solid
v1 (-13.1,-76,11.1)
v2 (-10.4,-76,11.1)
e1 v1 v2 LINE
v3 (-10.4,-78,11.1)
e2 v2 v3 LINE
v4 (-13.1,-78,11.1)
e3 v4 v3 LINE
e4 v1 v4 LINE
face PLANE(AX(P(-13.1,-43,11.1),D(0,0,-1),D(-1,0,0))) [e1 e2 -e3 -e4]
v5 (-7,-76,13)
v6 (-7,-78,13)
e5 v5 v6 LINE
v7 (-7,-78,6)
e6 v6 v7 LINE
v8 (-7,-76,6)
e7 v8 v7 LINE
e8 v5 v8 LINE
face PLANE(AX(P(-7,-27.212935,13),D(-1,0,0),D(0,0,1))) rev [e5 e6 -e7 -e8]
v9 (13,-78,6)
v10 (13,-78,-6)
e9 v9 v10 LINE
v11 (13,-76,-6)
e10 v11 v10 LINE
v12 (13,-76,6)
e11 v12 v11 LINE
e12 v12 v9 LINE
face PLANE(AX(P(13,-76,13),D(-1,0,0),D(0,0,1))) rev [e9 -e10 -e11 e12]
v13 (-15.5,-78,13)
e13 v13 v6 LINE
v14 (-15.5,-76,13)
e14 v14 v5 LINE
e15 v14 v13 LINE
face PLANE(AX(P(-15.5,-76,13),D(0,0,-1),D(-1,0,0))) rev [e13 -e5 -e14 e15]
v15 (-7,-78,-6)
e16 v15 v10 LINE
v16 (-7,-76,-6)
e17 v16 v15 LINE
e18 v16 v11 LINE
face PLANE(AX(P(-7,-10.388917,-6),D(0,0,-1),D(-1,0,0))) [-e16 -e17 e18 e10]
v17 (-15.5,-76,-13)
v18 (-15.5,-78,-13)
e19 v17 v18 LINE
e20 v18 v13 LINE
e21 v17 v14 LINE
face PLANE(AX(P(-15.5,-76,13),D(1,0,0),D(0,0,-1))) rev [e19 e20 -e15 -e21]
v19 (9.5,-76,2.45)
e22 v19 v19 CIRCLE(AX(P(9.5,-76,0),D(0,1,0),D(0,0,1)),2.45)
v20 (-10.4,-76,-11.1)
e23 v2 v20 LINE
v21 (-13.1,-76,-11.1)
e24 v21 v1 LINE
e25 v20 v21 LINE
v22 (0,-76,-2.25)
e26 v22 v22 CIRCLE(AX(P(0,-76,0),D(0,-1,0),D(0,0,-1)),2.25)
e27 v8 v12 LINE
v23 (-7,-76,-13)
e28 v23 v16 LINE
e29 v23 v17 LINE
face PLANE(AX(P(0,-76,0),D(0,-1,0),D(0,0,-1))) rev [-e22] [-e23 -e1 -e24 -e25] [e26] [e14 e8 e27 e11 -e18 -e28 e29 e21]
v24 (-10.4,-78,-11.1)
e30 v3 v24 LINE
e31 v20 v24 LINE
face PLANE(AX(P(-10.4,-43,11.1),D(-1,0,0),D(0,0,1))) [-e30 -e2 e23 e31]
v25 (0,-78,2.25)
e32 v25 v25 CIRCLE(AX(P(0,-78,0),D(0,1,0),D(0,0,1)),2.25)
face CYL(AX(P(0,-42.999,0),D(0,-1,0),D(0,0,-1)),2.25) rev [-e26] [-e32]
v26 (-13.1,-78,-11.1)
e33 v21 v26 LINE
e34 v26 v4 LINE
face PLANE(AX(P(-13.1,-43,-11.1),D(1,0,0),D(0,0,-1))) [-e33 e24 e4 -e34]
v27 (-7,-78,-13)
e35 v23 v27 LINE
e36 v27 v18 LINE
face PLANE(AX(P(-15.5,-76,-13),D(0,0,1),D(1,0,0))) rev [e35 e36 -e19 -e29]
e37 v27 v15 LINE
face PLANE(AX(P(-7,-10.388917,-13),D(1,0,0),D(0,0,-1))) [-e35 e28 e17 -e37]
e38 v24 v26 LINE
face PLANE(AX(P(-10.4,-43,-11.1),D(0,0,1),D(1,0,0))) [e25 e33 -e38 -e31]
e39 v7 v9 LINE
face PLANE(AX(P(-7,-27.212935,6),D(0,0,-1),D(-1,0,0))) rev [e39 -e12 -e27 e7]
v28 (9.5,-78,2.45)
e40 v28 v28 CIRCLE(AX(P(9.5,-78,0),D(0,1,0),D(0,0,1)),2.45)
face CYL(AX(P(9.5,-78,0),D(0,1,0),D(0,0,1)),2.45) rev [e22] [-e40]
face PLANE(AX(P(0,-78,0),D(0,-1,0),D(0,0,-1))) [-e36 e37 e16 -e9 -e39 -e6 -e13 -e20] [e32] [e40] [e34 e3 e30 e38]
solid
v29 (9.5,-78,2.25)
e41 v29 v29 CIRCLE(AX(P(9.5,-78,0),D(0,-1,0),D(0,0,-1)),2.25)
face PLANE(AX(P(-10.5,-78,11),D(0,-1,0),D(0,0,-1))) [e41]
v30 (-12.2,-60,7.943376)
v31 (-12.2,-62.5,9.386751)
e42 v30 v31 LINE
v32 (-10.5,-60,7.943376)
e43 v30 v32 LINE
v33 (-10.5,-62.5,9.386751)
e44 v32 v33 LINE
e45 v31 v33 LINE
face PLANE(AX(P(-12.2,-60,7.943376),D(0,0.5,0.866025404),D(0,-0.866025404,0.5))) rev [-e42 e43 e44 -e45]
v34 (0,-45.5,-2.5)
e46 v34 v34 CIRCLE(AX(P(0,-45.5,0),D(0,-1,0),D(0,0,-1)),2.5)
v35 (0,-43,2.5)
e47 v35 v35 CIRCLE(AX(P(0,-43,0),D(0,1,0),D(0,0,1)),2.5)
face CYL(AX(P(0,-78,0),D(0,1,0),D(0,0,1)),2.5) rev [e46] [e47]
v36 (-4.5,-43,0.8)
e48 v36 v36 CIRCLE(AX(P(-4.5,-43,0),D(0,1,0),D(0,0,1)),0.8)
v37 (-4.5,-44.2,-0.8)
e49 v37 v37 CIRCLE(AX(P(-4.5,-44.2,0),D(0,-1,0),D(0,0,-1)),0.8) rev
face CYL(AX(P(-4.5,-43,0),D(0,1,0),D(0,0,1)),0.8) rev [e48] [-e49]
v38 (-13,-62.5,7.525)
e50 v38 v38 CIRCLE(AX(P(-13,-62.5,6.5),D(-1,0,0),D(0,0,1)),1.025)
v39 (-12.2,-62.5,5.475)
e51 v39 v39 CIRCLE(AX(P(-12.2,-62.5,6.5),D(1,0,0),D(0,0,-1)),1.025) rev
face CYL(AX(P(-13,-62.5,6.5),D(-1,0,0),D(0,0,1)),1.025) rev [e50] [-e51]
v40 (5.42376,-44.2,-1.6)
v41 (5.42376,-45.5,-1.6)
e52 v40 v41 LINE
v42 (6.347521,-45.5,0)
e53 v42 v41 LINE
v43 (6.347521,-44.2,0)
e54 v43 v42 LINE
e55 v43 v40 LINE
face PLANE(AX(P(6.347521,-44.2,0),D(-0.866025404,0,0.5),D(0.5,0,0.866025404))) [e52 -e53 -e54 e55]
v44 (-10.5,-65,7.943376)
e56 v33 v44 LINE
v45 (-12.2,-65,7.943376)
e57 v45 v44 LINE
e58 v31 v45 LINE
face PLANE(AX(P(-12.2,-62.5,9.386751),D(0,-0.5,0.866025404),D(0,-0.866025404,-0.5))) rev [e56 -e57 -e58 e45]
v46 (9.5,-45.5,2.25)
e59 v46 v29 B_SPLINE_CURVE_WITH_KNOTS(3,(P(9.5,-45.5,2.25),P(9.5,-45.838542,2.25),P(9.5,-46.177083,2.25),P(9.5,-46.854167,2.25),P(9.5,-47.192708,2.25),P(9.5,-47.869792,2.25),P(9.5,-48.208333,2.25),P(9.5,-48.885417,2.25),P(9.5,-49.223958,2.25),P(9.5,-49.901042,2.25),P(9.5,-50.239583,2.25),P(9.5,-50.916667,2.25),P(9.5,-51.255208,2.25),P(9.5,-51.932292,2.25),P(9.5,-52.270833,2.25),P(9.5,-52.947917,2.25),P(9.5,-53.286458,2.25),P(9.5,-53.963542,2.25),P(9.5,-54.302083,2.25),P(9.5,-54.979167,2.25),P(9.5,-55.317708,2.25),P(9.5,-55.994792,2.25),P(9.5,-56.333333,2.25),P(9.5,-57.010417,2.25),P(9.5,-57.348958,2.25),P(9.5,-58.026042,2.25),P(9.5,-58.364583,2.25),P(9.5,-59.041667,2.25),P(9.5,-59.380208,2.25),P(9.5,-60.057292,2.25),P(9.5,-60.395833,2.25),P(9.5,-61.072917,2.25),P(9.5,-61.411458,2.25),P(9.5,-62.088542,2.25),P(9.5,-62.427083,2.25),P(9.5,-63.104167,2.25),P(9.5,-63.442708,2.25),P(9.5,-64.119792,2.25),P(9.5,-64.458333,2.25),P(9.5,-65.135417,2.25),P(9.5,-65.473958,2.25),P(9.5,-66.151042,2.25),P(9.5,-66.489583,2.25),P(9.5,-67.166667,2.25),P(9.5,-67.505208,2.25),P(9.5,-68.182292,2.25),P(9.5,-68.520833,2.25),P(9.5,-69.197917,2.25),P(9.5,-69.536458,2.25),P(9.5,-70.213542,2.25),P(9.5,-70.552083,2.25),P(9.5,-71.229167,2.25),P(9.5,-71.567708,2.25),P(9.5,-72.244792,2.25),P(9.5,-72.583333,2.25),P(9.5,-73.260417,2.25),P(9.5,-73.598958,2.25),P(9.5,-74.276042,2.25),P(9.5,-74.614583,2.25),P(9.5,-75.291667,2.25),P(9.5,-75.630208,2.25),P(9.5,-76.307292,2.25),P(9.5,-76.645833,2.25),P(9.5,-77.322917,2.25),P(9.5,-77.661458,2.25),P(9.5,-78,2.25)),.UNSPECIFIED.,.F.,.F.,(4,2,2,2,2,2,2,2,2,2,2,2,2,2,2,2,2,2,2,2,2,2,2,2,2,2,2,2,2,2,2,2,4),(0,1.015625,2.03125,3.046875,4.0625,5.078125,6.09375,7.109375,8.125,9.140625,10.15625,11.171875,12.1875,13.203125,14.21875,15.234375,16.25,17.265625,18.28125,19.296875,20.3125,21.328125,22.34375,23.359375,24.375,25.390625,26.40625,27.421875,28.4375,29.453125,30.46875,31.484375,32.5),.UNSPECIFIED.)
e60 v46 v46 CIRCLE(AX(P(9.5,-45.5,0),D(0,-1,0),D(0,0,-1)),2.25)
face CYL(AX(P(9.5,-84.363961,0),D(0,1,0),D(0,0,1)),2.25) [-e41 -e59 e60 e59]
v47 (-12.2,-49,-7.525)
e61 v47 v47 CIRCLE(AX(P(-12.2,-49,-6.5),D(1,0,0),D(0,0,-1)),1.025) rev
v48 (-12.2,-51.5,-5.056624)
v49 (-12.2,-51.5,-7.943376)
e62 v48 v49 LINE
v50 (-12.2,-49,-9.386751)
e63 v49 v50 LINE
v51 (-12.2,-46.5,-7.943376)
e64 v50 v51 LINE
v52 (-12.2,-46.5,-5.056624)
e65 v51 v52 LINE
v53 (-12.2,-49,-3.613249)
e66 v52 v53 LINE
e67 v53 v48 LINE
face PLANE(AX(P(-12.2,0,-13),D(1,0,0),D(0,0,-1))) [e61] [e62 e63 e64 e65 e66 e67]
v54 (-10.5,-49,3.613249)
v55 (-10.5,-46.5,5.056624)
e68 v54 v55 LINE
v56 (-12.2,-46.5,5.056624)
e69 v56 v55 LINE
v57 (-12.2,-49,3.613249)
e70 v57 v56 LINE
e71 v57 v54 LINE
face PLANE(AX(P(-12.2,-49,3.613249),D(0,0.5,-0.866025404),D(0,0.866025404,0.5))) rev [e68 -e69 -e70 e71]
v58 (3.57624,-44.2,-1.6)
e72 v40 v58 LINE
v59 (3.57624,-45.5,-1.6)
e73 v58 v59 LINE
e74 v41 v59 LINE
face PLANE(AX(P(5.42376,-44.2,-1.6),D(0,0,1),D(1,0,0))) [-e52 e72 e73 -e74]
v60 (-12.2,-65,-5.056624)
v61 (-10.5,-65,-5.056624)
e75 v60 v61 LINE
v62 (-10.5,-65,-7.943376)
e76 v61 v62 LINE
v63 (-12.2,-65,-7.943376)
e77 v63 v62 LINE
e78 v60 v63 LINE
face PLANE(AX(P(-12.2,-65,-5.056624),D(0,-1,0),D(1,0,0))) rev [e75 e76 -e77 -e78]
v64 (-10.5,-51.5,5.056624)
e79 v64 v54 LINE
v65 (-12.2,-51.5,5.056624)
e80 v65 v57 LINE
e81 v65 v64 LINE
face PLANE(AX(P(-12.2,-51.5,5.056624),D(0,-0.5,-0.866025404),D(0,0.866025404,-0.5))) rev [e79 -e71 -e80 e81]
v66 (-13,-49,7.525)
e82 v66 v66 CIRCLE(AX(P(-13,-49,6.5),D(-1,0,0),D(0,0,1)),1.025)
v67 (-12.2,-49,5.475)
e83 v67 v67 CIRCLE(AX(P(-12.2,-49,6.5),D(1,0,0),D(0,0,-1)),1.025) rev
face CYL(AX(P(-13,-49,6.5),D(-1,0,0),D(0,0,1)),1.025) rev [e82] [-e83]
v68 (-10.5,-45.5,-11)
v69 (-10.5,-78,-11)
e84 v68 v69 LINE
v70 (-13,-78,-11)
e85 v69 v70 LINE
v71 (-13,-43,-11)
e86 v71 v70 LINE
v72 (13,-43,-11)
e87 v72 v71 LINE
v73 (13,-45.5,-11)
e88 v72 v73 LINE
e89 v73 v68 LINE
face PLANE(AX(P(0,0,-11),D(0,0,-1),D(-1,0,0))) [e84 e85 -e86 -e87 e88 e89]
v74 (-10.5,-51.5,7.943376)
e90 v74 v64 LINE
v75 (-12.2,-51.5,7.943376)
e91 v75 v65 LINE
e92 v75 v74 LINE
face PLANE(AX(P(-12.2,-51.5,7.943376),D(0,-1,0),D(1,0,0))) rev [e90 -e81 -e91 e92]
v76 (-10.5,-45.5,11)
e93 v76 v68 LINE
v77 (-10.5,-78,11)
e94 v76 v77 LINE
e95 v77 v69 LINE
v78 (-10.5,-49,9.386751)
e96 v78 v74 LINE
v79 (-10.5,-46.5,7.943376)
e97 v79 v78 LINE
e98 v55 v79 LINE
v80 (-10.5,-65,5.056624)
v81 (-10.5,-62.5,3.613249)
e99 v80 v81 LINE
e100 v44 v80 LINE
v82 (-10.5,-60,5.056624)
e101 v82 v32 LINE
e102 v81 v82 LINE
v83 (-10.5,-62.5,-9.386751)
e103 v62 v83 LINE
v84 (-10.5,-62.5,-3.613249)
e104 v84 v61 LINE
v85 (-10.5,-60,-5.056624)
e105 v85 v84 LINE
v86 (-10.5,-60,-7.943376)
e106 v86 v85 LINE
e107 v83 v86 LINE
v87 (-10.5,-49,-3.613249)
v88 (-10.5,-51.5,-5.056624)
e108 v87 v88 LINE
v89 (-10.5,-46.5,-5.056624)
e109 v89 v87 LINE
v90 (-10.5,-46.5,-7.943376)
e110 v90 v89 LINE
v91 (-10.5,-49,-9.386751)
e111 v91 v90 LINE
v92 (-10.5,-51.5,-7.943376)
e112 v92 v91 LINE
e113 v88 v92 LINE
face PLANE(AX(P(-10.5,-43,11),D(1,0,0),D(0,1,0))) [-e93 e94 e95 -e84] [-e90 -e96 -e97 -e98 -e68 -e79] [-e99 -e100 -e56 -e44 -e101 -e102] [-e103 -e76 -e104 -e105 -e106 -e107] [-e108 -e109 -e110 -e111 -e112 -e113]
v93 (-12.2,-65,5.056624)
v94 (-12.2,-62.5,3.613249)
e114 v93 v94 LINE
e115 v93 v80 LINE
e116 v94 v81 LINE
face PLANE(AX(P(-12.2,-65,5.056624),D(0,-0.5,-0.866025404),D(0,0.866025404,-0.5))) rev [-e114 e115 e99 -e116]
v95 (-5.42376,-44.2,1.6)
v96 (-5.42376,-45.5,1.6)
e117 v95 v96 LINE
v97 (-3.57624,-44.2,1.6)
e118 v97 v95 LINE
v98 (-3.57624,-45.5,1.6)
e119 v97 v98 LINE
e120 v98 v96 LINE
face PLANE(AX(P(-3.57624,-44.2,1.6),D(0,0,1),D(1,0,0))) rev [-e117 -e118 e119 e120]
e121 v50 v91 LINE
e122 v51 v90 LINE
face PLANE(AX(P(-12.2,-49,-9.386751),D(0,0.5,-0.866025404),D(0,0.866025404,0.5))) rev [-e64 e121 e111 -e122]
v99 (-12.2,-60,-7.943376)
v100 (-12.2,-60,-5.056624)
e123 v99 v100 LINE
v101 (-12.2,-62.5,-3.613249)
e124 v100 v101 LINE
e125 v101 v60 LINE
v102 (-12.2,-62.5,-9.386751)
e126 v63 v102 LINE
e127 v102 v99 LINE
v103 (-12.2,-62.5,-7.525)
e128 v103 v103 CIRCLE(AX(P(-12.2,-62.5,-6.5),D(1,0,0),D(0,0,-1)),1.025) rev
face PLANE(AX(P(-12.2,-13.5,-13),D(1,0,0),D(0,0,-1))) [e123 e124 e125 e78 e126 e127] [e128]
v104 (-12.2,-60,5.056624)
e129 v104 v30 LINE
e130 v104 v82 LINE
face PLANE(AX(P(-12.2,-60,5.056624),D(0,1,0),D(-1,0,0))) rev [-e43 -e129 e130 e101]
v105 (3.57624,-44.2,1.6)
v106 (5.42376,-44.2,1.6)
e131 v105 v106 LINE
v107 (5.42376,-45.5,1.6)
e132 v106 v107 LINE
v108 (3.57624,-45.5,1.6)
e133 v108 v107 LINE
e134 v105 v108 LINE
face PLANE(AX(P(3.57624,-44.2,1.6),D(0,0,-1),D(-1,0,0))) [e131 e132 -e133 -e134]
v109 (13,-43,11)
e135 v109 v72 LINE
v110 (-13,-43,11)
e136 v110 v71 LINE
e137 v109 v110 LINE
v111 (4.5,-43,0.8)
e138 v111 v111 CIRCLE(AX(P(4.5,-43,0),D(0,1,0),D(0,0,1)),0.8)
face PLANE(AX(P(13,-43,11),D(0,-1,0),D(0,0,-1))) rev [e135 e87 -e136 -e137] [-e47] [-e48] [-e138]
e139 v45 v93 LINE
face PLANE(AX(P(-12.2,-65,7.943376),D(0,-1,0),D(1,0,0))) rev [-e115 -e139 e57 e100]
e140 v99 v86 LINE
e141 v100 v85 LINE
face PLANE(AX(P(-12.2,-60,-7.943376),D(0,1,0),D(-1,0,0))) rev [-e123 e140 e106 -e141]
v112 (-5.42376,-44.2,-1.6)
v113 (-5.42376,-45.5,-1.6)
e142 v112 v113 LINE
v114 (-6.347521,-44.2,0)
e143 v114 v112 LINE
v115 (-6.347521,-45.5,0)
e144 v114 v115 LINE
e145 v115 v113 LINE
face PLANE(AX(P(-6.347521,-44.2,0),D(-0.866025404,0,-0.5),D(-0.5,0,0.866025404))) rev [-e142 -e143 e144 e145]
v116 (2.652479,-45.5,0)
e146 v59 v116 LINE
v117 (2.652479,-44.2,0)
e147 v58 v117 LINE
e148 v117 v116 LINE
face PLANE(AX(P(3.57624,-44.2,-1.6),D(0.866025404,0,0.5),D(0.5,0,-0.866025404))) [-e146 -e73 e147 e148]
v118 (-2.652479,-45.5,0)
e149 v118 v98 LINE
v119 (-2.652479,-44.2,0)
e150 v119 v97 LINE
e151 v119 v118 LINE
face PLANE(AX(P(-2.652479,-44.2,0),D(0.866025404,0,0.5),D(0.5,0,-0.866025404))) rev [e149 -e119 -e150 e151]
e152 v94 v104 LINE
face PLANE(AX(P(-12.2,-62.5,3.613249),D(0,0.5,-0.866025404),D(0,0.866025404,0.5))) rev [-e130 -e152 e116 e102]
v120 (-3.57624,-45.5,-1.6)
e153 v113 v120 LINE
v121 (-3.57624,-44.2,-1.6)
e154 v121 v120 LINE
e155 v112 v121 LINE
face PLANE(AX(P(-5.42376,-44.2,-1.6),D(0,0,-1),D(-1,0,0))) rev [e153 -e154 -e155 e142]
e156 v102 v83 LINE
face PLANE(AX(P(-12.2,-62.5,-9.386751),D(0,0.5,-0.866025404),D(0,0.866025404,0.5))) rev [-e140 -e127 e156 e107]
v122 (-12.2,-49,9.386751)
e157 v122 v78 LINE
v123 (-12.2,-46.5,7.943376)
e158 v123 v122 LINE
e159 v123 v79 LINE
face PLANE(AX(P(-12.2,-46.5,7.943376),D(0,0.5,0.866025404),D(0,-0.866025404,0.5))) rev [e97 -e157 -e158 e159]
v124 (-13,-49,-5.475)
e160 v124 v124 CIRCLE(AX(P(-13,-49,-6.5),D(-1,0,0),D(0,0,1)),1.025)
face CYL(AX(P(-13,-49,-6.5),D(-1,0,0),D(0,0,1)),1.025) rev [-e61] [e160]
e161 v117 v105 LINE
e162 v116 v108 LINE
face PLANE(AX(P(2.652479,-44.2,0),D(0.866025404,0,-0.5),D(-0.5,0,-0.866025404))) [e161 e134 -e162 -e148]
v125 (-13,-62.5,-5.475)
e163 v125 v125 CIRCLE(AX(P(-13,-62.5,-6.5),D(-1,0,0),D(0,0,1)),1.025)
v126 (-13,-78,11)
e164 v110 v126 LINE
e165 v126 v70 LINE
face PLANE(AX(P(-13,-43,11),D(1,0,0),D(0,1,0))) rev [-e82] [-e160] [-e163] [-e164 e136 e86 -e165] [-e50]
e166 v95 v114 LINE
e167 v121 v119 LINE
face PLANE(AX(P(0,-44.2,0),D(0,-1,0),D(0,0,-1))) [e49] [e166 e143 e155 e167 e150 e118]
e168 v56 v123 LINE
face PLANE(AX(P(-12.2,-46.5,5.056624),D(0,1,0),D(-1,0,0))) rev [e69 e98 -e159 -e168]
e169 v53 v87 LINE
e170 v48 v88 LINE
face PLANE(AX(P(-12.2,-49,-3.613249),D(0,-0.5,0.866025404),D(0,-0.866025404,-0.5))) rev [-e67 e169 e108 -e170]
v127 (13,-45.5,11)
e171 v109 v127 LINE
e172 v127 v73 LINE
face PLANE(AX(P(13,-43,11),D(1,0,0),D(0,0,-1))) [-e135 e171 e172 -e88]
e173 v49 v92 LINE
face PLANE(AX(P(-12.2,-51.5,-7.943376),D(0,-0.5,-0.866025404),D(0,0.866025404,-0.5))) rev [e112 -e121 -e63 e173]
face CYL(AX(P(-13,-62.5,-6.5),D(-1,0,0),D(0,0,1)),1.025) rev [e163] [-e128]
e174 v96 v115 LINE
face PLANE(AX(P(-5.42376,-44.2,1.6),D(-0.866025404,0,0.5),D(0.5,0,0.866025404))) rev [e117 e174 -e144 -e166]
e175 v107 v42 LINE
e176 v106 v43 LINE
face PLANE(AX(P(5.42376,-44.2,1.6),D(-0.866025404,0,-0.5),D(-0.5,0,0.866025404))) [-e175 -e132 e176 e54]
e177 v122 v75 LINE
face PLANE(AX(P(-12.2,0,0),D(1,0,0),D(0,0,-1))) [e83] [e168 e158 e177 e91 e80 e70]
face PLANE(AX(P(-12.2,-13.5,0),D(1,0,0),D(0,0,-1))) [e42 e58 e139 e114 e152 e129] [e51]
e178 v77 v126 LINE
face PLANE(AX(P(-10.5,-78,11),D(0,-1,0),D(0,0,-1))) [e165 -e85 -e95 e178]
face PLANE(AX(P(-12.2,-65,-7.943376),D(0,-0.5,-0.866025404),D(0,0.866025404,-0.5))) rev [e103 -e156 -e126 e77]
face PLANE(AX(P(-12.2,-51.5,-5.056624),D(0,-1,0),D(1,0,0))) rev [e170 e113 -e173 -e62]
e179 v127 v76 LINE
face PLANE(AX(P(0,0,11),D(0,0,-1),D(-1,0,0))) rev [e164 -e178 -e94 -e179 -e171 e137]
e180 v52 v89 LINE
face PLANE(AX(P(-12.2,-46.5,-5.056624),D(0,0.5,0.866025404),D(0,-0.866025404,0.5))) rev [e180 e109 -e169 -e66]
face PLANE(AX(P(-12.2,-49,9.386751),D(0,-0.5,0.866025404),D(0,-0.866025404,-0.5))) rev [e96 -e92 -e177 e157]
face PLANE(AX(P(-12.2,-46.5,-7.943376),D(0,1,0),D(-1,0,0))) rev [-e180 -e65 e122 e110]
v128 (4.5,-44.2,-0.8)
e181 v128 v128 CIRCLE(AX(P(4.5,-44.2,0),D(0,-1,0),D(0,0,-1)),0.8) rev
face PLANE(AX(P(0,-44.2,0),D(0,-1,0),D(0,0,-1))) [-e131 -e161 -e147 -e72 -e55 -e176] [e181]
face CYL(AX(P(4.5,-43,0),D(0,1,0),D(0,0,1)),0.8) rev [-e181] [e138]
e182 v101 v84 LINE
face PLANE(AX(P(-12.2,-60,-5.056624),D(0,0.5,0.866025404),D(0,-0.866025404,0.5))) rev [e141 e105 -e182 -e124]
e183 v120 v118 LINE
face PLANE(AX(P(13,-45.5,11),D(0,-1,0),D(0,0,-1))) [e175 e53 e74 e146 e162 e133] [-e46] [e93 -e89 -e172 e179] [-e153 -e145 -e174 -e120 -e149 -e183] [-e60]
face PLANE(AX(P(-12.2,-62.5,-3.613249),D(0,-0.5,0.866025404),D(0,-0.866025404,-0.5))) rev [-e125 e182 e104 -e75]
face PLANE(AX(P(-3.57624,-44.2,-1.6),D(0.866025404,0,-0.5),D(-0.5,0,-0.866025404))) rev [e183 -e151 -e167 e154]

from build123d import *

# Parameters (mm, degrees)
EXTRUDE_THIN1_DEPTH          = 11
SKETCH6_R                    = 2.5
CUT_EXTRUDE1_DEPTH           = 39.923000912
BOSS_EXTRUDE1_START          = -78
SUPPORT_R                    = 2.25
BOSS_EXTRUDE1_DEPTH          = 32.5
SKETCH8_W                    = 28.5
SKETCH8_H                    = 26
BOSS_EXTRUDE2_DEPTH          = 2
SKETCH9_R                    = 2.45
CUT_EXTRUDE2_DEPTH           = 39.707234466
SKETCH11_W                   = 2.7
SKETCH11_H                   = 22.2
CUT_EXTRUDE3_DEPTH           = 41.425858061
M2_5_TAPPED_HOLE1_AT_2_COUNT = 2
M2_5_TAPPED_HOLE1_AT_2_PITCH = 13
M2_5_TAPPED_HOLE1_AT_3_COUNT = 2
M2_5_TAPPED_HOLE1_AT_3_PITCH = 18.741664814
M2_5_TAPPED_HOLE1_AT_4_COUNT = 2
M2_5_TAPPED_HOLE1_AT_4_PITCH = 13.5
SKETCH13_R                   = 2.25
CUT_EXTRUDE4_DEPTH           = 2
CUT_EXTRUDE5_DEPTH           = 41.425858061
M2_TAPPED_HOLE1_AT_2_COUNT   = 2
M2_TAPPED_HOLE1_AT_2_PITCH   = 9
CUT_EXTRUDE6_DEPTH           = 1.3
CUT_EXTRUDE7_DEPTH           = 1.7
SKETCH_PATTERN1_START        = -12.2
SKETCH_PATTERN1_OUTLINE_R    = 1.025
SKETCH_PATTERN1_DEPTH        = 1.7


# Read off the part's stored shape, not the designer's step: Sketch-Pattern1
with BuildPart() as part:
    # Arm → Extrude-Thin1 (new, symmetric)
    with BuildSketch(Plane.XY):
        Polygon((13, -43), (-13, -43), (-13, -78), (-10.5, -78), (-10.5, -45.5), (13, -45.5), align=None)
    extrude(amount=EXTRUDE_THIN1_DEPTH, both=True)

    # Sketch6 → Cut-Extrude1 (cut, through all)
    with BuildSketch(Plane(origin=(0, -43, 0), x_dir=(1, 0, 0), z_dir=(0, 1, 0))):
        with Locations(Location((0, 0, 0), (0, 0, 270))):
            Circle(SKETCH6_R)
    extrude(amount=-CUT_EXTRUDE1_DEPTH, mode=Mode.SUBTRACT)

    # Support (on Top Plane) → Boss-Extrude1 (add)
    with BuildSketch(Plane(origin=(0, 0, 0), x_dir=(1, 0, 0), z_dir=(0, 1, 0)).offset(BOSS_EXTRUDE1_START)):
        with Locations(Location((9.5, 0, 0), (0, 0, 270))):
            Circle(SUPPORT_R)
    extrude(amount=BOSS_EXTRUDE1_DEPTH)

    # Sketch16 → M2.5 Tapped Hole1 (revolve, cut)
    with BuildSketch(Plane(origin=(-13, -49, 6.5), x_dir=(0, 0, 1), z_dir=(0, 1, 0))):
        Polygon((0, 0), (0, 6.965882135), (1.025, 6.35), (1.025, 0), align=None)
    m2_5_tapped_hole1 = revolve(axis=Axis((-19.35, -49, 6.5), (1, 0, 0)), mode=Mode.SUBTRACT)

    # M2.5 Tapped Hole1 at 2: M2.5 Tapped Hole1 ×2
    with Locations(*[(0, 0, -i * M2_5_TAPPED_HOLE1_AT_2_PITCH) for i in range(1, M2_5_TAPPED_HOLE1_AT_2_COUNT)]):
        add(m2_5_tapped_hole1, mode=Mode.SUBTRACT)

    # M2.5 Tapped Hole1 at 3: M2.5 Tapped Hole1 ×2
    with Locations(*[Vector(0, -0.720320213491481, -0.6936416870658707) * (i * M2_5_TAPPED_HOLE1_AT_3_PITCH) for i in range(1, M2_5_TAPPED_HOLE1_AT_3_COUNT)]):
        add(m2_5_tapped_hole1, mode=Mode.SUBTRACT)

    # M2.5 Tapped Hole1 at 4: M2.5 Tapped Hole1 ×2
    with Locations(*[(0, -i * M2_5_TAPPED_HOLE1_AT_4_PITCH, 0) for i in range(1, M2_5_TAPPED_HOLE1_AT_4_COUNT)]):
        add(m2_5_tapped_hole1, mode=Mode.SUBTRACT)

    # Sketch20 → M2 Tapped Hole1 (revolve, cut)
    with BuildSketch(Plane(origin=(4.5, -43, 0), x_dir=(0, 0, 1), z_dir=(1, 0, 0))):
        Polygon((0, 0), (0, 2.980688495), (0.8, 2.5), (0.8, 0), align=None)
    m2_tapped_hole1 = revolve(axis=Axis((4.5, -36.65, 0), (0, -1, 0)), mode=Mode.SUBTRACT)

    # M2 Tapped Hole1 at 2: M2 Tapped Hole1 ×2
    with Locations(*[(-i * M2_TAPPED_HOLE1_AT_2_PITCH, 0, 0) for i in range(1, M2_TAPPED_HOLE1_AT_2_COUNT)]):
        add(m2_tapped_hole1, mode=Mode.SUBTRACT)

    # Sketch21 → Cut-Extrude6 (cut)
    with BuildSketch(Plane.XZ.offset(45.5)):
        Polygon((-3.576239569, 1.6), (-5.423760431, 1.6), (-6.347520861, 0), (-5.423760431, -1.6), (-3.576239569, -1.6), (-2.652479139, 0), align=None)
    cut_extrude6 = extrude(amount=-CUT_EXTRUDE6_DEPTH, mode=Mode.SUBTRACT)

    # Mirror2: Cut-Extrude6 across plane
    add(cut_extrude6.mirror(Plane(origin=(0, 0, 0), x_dir=(0, 0, 1), z_dir=(1, 0, 0))), mode=Mode.SUBTRACT)

    # Sketch22 → Cut-Extrude7 (cut)
    with BuildSketch(Plane(origin=(-10.5, 0, 0), x_dir=(0, 0, -1), z_dir=(1, 0, 0))):
        Polygon((-5.056624327, -51.5), (-3.613248654, -49), (-5.056624327, -46.5), (-7.943375673, -46.5), (-9.386751346, -49), (-7.943375673, -51.5), align=None)
    extrude(amount=-CUT_EXTRUDE7_DEPTH, mode=Mode.SUBTRACT)

    # Sketch-Pattern1 outline → Sketch-Pattern1 (cut)
    # profile 1 of 3: a face of its own
    with BuildSketch(Plane.YZ.offset(SKETCH_PATTERN1_START)):
        Polygon((-49, -3.613248654), (-51.5, -5.056624327), (-51.5, -7.943375673), (-49, -9.386751346), (-46.5, -7.943375673), (-46.5, -5.056624327), align=None)
        with Locations((-49, -6.5)):
            Circle(SKETCH_PATTERN1_OUTLINE_R, mode=Mode.SUBTRACT)
    # profile 2 of 3: a face of its own
    with BuildSketch(Plane.YZ.offset(SKETCH_PATTERN1_START)):
        Polygon((-62.5, -3.613248654), (-65, -5.056624327), (-65, -7.943375673), (-62.5, -9.386751346), (-60, -7.943375673), (-60, -5.056624327), align=None)
        with Locations((-62.5, -6.5)):
            Circle(SKETCH_PATTERN1_OUTLINE_R, mode=Mode.SUBTRACT)
    # profile 3 of 3: a face of its own
    with BuildSketch(Plane.YZ.offset(SKETCH_PATTERN1_START)):
        Polygon((-62.5, 9.386751346), (-65, 7.943375673), (-65, 5.056624327), (-62.5, 3.613248654), (-60, 5.056624327), (-60, 7.943375673), align=None)
        with Locations((-62.5, 6.5)):
            Circle(SKETCH_PATTERN1_OUTLINE_R, mode=Mode.SUBTRACT)
    extrude(amount=SKETCH_PATTERN1_DEPTH, mode=Mode.SUBTRACT)


with BuildPart() as body_2:
    # Sketch8 → Boss-Extrude2 (new body)
    with BuildSketch(Plane(origin=(0, -78, 0), x_dir=(1, 0, 0), z_dir=(0, 1, 0))):
        with Locations((-1.25, 0)):
            Rectangle(SKETCH8_W, SKETCH8_H)
    extrude(amount=BOSS_EXTRUDE2_DEPTH)

    # Sketch9 → Cut-Extrude2 (cut, through all)
    with BuildSketch(Plane(origin=(0, -76, 0), x_dir=(1, 0, 0), z_dir=(0, 1, 0))):
        with Locations(Location((9.5, 0, 0), (0, 0, 270))):
            Circle(SKETCH9_R)
    extrude(amount=-CUT_EXTRUDE2_DEPTH, mode=Mode.SUBTRACT)

    # Sketch11 → Cut-Extrude3 (cut, through all)
    with BuildSketch(Plane(origin=(0, -78, 0), x_dir=(1, 0, 0), z_dir=(0, 1, 0))):
        with Locations((-11.75, 0)):
            Rectangle(SKETCH11_W, SKETCH11_H)
    extrude(amount=CUT_EXTRUDE3_DEPTH, mode=Mode.SUBTRACT)

    # Sketch13 → Cut-Extrude4 (cut)
    with BuildSketch(Plane(origin=(0, -78, 0), x_dir=(1, 0, 0), z_dir=(0, 1, 0))):
        with Locations(Location((0, 0, 0), (0, 0, 90))):
            Circle(SKETCH13_R)
    extrude(amount=CUT_EXTRUDE4_DEPTH, mode=Mode.SUBTRACT)

    # Sketch17 → Cut-Extrude5 (cut, symmetric)
    with BuildSketch(Plane(origin=(0, -78, 0), x_dir=(1, 0, 0), z_dir=(0, 1, 0))):
        Polygon((-7, 91.505474234), (-7, 13), (-7, 6), (13, 6), (91.505474234, 6), (194.428862648, 124.571556691), (95.923388414, 210.077030925), align=None)
    cut_extrude5 = extrude(amount=CUT_EXTRUDE5_DEPTH, both=True, mode=Mode.SUBTRACT)

    # Mirror1: Cut-Extrude5 across plane
    add(cut_extrude5.mirror(Plane.XY), mode=Mode.SUBTRACT)


solid = Compound([part.part, body_2.part])
